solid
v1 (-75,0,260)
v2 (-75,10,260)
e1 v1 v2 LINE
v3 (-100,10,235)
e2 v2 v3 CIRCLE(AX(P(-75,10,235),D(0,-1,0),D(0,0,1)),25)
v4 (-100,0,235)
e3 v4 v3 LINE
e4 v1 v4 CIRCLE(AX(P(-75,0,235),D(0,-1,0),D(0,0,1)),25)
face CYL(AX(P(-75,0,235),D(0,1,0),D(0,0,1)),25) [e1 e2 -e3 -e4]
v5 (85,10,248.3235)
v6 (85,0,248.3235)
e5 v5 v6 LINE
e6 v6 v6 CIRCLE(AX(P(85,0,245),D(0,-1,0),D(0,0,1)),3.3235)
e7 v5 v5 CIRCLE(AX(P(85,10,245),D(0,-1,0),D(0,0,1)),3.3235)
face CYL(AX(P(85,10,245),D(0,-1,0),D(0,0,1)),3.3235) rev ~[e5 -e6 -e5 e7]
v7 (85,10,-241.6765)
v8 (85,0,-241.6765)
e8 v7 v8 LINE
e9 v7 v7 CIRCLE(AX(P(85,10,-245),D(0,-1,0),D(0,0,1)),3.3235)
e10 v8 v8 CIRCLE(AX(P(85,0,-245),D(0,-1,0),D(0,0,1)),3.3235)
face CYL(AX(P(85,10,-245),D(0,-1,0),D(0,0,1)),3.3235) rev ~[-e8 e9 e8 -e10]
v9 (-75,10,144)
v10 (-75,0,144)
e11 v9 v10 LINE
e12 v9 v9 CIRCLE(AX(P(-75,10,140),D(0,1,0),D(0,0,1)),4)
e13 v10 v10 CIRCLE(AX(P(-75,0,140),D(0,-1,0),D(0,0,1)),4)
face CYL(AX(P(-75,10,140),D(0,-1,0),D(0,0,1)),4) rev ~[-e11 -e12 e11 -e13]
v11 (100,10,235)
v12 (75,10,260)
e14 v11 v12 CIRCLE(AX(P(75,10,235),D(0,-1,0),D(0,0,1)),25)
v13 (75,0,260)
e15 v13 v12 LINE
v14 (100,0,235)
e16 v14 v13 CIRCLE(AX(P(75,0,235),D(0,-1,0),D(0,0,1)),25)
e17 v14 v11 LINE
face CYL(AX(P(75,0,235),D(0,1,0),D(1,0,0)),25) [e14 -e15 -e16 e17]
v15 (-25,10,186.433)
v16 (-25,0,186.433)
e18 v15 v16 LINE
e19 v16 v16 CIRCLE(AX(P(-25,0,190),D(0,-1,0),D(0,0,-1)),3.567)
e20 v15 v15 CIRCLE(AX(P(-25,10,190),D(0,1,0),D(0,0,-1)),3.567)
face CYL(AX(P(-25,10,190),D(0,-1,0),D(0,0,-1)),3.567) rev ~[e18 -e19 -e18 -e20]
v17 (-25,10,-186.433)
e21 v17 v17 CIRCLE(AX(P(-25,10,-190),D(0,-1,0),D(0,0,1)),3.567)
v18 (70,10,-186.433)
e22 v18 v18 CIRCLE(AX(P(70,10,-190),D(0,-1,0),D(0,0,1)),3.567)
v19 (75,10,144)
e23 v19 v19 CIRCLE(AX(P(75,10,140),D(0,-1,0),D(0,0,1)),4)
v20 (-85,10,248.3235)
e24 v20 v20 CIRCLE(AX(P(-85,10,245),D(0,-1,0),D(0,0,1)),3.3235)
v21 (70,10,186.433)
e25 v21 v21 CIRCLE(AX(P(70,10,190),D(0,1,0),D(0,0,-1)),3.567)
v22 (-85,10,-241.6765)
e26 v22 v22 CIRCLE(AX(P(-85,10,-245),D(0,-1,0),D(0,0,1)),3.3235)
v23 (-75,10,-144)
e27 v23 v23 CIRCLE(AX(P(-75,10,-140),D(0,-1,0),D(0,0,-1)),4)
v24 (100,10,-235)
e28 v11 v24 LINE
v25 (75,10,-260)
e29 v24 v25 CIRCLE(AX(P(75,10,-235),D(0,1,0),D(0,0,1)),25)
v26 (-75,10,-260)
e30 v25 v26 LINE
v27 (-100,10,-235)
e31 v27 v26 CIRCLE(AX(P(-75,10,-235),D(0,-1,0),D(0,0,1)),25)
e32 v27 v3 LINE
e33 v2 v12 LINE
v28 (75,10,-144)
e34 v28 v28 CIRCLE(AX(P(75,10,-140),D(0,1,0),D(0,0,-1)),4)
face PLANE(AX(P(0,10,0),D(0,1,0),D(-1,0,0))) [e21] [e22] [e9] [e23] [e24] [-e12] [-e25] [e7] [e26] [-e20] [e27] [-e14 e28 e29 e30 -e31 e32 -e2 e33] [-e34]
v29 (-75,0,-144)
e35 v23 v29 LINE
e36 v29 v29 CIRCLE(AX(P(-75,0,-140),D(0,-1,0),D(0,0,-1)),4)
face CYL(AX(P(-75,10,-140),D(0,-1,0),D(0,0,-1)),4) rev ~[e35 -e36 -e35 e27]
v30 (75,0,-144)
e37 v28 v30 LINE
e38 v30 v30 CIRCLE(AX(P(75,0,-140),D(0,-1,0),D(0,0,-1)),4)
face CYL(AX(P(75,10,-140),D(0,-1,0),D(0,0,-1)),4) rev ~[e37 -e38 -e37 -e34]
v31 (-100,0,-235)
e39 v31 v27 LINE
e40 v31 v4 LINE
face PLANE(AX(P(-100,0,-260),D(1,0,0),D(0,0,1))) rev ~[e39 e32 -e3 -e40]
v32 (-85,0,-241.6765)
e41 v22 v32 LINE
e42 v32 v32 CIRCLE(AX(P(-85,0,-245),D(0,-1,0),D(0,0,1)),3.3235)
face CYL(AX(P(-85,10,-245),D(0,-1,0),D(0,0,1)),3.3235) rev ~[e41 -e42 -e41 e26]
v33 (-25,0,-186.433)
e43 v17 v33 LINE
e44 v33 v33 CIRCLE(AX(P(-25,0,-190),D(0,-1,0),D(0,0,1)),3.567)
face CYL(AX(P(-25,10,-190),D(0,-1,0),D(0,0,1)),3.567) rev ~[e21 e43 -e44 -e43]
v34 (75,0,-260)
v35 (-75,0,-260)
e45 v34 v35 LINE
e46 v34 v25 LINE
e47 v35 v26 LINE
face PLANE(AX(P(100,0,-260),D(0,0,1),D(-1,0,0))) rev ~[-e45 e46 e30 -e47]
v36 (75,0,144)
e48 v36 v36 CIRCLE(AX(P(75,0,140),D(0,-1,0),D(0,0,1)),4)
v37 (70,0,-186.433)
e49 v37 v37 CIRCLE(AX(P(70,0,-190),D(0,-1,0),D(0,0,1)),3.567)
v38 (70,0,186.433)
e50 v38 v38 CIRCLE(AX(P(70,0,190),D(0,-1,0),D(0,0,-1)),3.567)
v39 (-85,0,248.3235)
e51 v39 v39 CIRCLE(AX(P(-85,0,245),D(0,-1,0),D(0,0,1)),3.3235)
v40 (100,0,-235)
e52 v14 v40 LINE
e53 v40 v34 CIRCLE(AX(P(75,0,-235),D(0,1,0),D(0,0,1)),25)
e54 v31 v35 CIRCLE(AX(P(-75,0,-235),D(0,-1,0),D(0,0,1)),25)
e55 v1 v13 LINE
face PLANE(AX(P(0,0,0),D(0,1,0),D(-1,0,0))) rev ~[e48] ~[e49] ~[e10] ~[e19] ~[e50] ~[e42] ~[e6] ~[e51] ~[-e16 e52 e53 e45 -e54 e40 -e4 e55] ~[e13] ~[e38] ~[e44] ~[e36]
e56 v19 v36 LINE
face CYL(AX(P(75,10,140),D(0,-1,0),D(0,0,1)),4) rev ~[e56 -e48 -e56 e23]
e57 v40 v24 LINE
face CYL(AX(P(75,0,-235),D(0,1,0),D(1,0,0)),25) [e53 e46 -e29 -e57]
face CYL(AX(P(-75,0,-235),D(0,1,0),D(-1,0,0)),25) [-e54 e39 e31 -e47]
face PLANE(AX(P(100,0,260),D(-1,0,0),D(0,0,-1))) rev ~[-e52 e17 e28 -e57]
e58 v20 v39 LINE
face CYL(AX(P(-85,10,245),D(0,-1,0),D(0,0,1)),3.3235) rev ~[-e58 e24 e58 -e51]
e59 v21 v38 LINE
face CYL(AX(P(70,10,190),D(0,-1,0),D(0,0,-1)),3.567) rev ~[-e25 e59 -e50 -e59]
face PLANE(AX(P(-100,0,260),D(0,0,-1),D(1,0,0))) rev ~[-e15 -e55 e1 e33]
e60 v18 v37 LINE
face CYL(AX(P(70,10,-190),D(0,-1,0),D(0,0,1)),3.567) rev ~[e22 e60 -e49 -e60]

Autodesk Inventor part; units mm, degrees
ref_plane "YZ Plane" through (0, 0, 0) normal (1, 0, 0) x (0, 1, 0)
ref_plane "XZ Plane" through (0, 0, 0) normal (0, 1, 0) x (-1, 0, 0)
ref_plane "XY Plane" through (0, 0, 0) normal (0, 0, 1) x (1, 0, 0)
sketch "Sketch1" plane through (0, 0, 0) normal (0, 1, 0) x (-1, 0, 0)
  line L0 (-100, -260) -> (100, -260)
  line L1 (100, -260) -> (100, 260)
  line L2 (100, 260) -> (-100, 260)
  line L3 (-100, 260) -> (-100, -260)
  line L4 (-100, -260) -> (100, 260) construction
  line L5 (100, -260) -> (-100, 260) construction
  point P0 (0, 0)
  dimension "d0" = 200
  dimension "d1" = 520
extrude "Extrusion1" add sketch "Sketch1" along normal blind 10
fillet "Fillet1" radius 25 4 edges at (-100, 5, -260) (-100, 5, 260) (100, 5, 260) (100, 5, -260)
sketch "Sketch2" plane through (0, 10, 0) normal (0, 1, 0) x (1, 0, 0)
  line L0 (100, -235) -> (100, 235) projected
  line L1 (-75, -260) -> (75, -260) projected
  point P0 (0, 0)
  point P1 (85, -245)
  dimension "d5" = 15
  dimension "d6" = 15
hole "Hole1" at (85, 10, 245) direction (0, -1, 0) diameter 6.647 end through all thread size "M8x1.25" class "6H" standard "ISO Metric profile"
pattern_linear "Rectangular Pattern1" count 2 spacing 170 along (-1, 0, 0) count 2 spacing 490 along (0, 0, -1) of "Hole1"
sketch "Sketch3" plane through (0, 10, 0) normal (0, 1, 0) x (1, 0, 0)
  line L0 (100, -235) -> (100, 235) projected
  line L1 (75, 260) -> (-75, 260) projected
  point P0 (0, 0)
  point P1 (70, 190)
  point P2 (-25, 190)
  dimension "d20" = 30
  dimension "d21" = 70
  dimension "d22" = 95
  dimension "d23" = 70
hole "Hole2" at (70, 10, -190) at (-25, 10, -190) direction (0, -1, 0) diameter 7.134 depth 20.2 tip angle 118 thread size "M8x0.8" class "6H" standard "ISO Metric profile"
mirror "Mirror1" about plane through (0, 0, 0) normal (0, 0, 1) of "Hole2"
sketch "Sketch4" plane through (0, 10, 0) normal (0, 1, 0) x (1, 0, 0)
  line L0 (100, -235) -> (100, 235) projected
  line L1 (-75, -260) -> (75, -260) projected
  point P0 (0, 0)
  point P1 (75, -140)
  dimension "d31" = 25
  dimension "d32" = 120
hole "Hole3" at (75, 10, 140) direction (0, -1, 0) diameter 8 end through all
mirror "Mirror2" about plane through (0, 0, 0) normal (0, 0, 1) of "Hole3"
mirror "Mirror3" about plane through (0, 0, 0) normal (1, 0, 0) of "Hole3", "Mirror2"
properties part number "Body_plate"
